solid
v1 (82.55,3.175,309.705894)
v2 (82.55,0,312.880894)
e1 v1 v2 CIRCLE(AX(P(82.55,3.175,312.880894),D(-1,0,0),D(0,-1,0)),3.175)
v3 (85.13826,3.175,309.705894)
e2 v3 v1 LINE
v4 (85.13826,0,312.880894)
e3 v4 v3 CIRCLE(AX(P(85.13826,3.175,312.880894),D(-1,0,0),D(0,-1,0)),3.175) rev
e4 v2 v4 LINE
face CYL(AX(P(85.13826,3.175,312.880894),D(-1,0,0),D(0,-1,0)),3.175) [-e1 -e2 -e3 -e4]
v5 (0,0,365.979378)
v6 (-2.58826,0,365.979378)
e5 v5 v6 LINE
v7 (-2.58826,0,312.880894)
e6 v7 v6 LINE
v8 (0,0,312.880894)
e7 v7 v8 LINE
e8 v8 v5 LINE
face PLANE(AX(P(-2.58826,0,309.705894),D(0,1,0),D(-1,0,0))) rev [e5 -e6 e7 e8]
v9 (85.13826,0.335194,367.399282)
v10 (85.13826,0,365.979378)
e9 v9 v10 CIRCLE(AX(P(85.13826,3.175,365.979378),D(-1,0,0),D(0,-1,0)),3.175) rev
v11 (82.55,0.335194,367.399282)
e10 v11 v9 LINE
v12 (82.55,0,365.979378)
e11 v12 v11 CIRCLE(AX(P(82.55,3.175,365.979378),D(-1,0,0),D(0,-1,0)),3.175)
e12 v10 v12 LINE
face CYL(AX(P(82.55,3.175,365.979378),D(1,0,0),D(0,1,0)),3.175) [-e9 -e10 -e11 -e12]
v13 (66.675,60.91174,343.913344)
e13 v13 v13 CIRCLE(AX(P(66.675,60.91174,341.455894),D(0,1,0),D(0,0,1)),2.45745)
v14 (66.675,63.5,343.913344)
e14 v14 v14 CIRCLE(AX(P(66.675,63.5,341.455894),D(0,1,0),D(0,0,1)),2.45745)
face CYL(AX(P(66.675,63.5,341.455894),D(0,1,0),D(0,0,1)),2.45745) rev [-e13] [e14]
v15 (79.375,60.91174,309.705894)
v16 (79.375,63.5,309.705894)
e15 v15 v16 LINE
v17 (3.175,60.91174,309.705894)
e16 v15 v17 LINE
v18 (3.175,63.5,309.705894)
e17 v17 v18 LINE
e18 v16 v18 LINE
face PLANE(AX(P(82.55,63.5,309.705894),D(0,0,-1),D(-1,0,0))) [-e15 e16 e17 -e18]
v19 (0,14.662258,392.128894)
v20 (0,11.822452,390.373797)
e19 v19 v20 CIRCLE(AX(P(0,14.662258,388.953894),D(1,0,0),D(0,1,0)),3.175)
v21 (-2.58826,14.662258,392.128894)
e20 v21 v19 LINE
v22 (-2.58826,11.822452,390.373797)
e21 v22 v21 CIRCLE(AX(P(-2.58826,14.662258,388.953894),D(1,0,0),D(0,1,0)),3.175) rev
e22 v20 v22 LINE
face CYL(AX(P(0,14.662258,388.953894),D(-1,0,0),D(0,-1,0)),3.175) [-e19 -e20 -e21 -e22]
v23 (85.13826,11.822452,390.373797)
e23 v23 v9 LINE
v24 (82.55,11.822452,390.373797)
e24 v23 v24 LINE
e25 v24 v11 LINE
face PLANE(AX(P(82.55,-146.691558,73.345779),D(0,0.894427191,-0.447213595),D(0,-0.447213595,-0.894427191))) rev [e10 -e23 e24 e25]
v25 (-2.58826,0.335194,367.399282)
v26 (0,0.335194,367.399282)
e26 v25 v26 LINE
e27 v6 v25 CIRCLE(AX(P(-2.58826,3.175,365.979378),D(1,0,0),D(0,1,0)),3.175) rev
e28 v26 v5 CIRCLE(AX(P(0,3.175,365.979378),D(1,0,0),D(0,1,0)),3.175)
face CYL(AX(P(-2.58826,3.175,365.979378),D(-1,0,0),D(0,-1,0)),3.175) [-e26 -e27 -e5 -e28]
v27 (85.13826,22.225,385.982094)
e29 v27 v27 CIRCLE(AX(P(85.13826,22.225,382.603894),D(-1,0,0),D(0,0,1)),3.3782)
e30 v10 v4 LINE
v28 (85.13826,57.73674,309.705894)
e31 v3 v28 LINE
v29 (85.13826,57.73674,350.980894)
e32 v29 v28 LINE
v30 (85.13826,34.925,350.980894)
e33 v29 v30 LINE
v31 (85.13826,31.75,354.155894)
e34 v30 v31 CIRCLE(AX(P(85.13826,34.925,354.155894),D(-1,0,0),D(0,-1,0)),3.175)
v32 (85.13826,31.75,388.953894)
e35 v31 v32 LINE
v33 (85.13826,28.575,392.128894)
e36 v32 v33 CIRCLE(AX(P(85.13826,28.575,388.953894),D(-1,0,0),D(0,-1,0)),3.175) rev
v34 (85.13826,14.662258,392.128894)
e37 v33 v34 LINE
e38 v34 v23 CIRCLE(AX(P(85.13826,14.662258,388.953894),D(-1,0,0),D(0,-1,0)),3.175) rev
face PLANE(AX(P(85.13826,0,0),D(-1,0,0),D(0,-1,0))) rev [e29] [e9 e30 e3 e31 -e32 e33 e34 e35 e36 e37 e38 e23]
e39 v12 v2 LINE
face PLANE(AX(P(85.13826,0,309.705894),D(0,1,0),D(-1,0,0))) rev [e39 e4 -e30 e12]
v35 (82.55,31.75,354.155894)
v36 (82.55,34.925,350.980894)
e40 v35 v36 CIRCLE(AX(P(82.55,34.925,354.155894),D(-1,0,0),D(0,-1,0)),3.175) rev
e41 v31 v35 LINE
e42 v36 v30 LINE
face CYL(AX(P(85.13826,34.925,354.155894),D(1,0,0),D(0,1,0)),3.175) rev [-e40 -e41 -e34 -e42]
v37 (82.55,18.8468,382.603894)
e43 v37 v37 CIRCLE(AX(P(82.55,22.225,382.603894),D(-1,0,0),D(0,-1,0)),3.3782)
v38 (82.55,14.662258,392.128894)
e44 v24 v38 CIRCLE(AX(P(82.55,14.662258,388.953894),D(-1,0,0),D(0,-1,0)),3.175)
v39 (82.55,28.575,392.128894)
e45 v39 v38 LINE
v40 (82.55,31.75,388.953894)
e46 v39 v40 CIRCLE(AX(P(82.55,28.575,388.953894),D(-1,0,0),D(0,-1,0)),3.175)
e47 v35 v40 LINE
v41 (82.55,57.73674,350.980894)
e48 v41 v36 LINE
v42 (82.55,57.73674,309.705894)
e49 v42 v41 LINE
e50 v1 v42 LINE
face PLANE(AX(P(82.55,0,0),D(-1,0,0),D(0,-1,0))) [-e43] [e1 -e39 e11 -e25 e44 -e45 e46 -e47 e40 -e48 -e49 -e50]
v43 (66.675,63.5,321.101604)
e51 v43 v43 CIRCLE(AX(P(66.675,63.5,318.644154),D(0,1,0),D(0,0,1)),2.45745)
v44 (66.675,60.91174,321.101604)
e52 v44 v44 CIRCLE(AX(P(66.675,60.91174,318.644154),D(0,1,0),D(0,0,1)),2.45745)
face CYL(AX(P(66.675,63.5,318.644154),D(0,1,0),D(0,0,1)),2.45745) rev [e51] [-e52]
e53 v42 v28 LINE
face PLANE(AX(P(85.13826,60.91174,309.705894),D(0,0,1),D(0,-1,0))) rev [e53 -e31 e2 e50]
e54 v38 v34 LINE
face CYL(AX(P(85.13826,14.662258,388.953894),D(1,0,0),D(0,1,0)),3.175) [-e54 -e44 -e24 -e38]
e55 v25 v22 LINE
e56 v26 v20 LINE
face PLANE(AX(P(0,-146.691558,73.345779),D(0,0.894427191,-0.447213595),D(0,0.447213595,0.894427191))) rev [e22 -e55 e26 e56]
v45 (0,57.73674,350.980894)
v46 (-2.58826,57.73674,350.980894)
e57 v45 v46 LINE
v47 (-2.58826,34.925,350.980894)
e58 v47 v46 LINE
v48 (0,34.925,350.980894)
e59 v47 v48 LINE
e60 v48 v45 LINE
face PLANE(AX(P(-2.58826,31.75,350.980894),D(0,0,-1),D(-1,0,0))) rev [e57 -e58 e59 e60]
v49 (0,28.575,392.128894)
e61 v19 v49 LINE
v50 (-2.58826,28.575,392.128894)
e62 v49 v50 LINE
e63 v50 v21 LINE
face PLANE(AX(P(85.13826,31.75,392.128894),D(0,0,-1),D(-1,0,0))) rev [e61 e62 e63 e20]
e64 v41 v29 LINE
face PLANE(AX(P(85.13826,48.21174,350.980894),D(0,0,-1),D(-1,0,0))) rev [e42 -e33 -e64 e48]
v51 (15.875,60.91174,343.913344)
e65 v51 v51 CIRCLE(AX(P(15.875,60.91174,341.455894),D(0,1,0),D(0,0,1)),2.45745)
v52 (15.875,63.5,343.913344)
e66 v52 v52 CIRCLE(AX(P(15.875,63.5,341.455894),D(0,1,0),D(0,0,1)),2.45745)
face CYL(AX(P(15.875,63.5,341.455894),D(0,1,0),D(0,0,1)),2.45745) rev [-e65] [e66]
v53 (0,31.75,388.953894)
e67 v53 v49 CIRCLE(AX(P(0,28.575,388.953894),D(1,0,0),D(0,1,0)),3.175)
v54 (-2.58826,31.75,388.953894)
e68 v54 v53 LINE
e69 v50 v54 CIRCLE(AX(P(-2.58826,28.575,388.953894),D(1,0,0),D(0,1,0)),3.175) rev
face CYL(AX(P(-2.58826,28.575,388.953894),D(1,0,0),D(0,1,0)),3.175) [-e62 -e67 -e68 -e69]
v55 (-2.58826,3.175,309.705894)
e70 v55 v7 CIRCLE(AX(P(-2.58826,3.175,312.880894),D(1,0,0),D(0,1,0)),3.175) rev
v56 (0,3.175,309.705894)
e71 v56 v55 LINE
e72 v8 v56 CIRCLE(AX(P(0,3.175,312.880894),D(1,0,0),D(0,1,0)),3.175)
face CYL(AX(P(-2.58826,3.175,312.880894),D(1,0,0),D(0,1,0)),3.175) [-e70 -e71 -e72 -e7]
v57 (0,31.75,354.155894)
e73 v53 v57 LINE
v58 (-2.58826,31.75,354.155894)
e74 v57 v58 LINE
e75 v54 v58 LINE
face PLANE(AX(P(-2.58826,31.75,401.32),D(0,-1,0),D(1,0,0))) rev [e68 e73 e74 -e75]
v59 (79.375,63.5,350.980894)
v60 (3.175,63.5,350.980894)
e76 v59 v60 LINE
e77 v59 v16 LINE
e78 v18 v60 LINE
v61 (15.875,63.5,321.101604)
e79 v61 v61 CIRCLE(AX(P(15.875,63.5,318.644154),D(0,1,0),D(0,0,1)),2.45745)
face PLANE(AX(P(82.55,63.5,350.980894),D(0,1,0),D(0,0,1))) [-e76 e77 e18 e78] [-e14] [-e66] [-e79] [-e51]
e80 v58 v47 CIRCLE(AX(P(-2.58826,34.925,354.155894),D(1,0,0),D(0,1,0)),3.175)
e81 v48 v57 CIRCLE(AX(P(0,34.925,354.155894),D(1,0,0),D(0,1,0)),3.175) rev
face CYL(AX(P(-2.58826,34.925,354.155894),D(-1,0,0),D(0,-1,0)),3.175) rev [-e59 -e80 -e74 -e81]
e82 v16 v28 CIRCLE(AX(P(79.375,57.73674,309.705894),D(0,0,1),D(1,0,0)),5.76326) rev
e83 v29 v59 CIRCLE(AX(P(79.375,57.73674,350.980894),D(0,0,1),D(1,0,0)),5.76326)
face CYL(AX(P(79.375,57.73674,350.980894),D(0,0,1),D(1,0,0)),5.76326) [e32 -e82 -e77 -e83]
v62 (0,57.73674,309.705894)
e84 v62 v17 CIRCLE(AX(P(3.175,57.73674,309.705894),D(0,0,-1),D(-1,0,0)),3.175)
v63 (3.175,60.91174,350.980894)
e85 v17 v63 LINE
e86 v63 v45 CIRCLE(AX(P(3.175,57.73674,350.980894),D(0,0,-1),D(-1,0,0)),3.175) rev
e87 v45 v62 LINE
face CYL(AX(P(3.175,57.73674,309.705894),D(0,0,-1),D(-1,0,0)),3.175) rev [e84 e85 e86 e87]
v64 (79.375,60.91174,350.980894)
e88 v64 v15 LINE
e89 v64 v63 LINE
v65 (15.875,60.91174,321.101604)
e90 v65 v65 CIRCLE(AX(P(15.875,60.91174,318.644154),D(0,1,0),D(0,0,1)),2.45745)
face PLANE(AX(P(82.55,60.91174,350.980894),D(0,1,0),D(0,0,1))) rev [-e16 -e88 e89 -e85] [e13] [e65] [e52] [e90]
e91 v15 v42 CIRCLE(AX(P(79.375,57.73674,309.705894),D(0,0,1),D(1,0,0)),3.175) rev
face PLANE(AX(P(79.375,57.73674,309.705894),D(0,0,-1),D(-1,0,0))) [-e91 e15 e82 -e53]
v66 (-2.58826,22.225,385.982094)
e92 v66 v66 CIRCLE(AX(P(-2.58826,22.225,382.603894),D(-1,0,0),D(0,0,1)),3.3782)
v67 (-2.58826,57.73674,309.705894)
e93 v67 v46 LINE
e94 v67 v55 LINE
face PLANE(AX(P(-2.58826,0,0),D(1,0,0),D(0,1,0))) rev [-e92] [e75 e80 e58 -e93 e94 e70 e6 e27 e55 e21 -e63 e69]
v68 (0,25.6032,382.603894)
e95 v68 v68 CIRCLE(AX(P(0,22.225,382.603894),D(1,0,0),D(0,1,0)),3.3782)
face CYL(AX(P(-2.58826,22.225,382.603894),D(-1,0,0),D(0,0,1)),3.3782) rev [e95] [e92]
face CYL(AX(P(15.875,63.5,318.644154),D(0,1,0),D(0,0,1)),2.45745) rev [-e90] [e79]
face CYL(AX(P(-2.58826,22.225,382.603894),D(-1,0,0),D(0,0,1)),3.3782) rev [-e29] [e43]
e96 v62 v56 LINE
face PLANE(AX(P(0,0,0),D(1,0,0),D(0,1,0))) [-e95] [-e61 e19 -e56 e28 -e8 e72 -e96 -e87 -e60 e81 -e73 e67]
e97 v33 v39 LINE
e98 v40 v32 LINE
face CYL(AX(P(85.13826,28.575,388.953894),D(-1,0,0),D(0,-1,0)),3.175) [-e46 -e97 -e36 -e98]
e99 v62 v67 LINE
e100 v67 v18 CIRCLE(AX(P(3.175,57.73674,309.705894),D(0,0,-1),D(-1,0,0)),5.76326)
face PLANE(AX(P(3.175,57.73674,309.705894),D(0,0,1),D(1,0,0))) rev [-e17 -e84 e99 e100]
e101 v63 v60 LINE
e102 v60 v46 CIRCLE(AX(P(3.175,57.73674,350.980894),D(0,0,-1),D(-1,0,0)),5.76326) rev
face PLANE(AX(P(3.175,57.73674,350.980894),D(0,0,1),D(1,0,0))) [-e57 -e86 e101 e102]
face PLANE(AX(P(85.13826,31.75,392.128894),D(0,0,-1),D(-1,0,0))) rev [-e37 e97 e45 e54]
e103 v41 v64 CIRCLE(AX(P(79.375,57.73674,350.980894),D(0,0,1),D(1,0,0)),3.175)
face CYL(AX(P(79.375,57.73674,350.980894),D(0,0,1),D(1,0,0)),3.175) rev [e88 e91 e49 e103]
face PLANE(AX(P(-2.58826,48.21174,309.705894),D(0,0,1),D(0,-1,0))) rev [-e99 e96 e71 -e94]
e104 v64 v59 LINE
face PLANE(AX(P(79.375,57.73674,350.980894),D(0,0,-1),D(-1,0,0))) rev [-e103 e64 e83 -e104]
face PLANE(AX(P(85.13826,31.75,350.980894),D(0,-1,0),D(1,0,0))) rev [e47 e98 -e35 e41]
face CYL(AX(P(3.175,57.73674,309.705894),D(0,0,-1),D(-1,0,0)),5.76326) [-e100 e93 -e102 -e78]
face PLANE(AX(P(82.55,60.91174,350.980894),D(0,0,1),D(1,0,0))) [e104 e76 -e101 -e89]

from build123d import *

# Parameters (mm, degrees)
SKETCH1_W                    = 41.275
SKETCH1_H                    = 2.58826
BASE_FLANGE1_DEPTH           = 82.55
EDGE_FLANGE1_STRIP_W         = 16.70304
EDGE_FLANGE1_STRIP_H         = 2.58826
EDGE_FLANGE1_STRIP_CUT_DEPTH = 41.275
EDGE_FLANGE1_DEPTH           = 41.275
EDGE_FLANGE1_START           = 2.58826
EDGE_FLANGE1_FLAT_DEPTH      = 2.58826
EDGE_FLANGE2_STRIP_W         = 16.70304
EDGE_FLANGE2_STRIP_H         = 2.58826
EDGE_FLANGE2_STRIP_CUT_DEPTH = 41.275
EDGE_FLANGE2_DEPTH           = 41.275
EDGE_FLANGE2_START           = 2.58826
EDGE_FLANGE2_FLAT_DEPTH      = 2.58826
F_1_4_CLEARANCE_HOLE1_D      = 6.7564
F_10_0_1935_DIAMETER_HOLE1_D = 4.9149
SKETCH19_W                   = 9.191105822
SKETCH19_H                   = 31.75
CUT_EXTRUDE1_DEPTH           = 416.675275559
FILLET2_START                = -2.58826
FILLET2_DEPTH                = 87.72652
FILLET2_2_DEPTH              = 2.58826
FILLET2_START_2              = 82.55
FILLET2_3_DEPTH              = 2.58826


with BuildPart() as part:
    # Base-Flange1: sheet metal written as solids
    # Sketch1 → Base-Flange1 (new body)
    with BuildSketch(Plane(origin=(0, 0, 0), x_dir=(0, 0, -1), z_dir=(1, 0, 0))):
        with Locations((-330.343394178, 62.20587)):
            Rectangle(SKETCH1_W, SKETCH1_H)
    extrude(amount=BASE_FLANGE1_DEPTH)

    # Edge-Flange1: sheet metal written as solids
    # Edge-Flange1 strip (on a plane across the edge) → Edge-Flange1 strip cut (cut)
    with BuildSketch(Plane(origin=(82.55, 60.91174, 309.705894178), x_dir=(-1, 0, 0), z_dir=(0, 0, 1))):
        with Locations((-5.17652, -1.29413)):
            Rectangle(EDGE_FLANGE1_STRIP_W, EDGE_FLANGE1_STRIP_H)
    extrude(amount=EDGE_FLANGE1_STRIP_CUT_DEPTH, mode=Mode.SUBTRACT)

    # Edge-Flange1 bend section (on a plane across the edge) → Edge-Flange1 (add)
    with BuildSketch(Plane(origin=(82.55, 60.91174, 309.705894178), x_dir=(-1, 0, 0), z_dir=(0, 0, 1))):
        with BuildLine():
            Line((-2.58826, 3.175), (0, 3.175))
            ThreePointArc((0, 3.175), (0.92993597, 0.92993597), (3.175, 0))
            Line((3.175, 0), (3.175, -2.58826))
            ThreePointArc((3.175, -2.58826), (-0.900240228, -0.900240228), (-2.58826, 3.175))
        make_face()
    extrude(amount=EDGE_FLANGE1_DEPTH)

    # Edge-Flange1 profile (on flange) → Edge-Flange1 flat (add)
    with BuildSketch(Plane(origin=(82.55, 60.91174, 0), x_dir=(0, 0, 1), z_dir=(1, 0, 0)).offset(EDGE_FLANGE1_START)):
        Polygon((350.980894178, 3.175), (350.980894178, 12.7), (350.980894178, 29.16174), (401.32, 29.16174), (401.32, 60.91174), (309.705894178, 60.91174), (309.705894178, 12.7), (309.705894178, 3.175), align=None)
    extrude(amount=-EDGE_FLANGE1_FLAT_DEPTH)

    # Edge-Flange2: sheet metal written as solids
    # Edge-Flange2 strip (on a plane across the edge) → Edge-Flange2 strip cut (cut)
    with BuildSketch(Plane(origin=(0, 60.91174, 350.980894178), x_dir=(1, 0, 0), z_dir=(0, 0, -1))):
        with Locations((-5.17652, -1.29413)):
            Rectangle(EDGE_FLANGE2_STRIP_W, EDGE_FLANGE2_STRIP_H)
    extrude(amount=EDGE_FLANGE2_STRIP_CUT_DEPTH, mode=Mode.SUBTRACT)

    # Edge-Flange2 bend section (on a plane across the edge) → Edge-Flange2 (add)
    with BuildSketch(Plane(origin=(0, 60.91174, 350.980894178), x_dir=(1, 0, 0), z_dir=(0, 0, -1))):
        with BuildLine():
            Line((-2.58826, 3.175), (0, 3.175))
            ThreePointArc((0, 3.175), (0.92993597, 0.92993597), (3.175, 0))
            Line((3.175, 0), (3.175, -2.58826))
            ThreePointArc((3.175, -2.58826), (-0.900240228, -0.900240228), (-2.58826, 3.175))
        make_face()
    extrude(amount=EDGE_FLANGE2_DEPTH)

    # Edge-Flange2 profile (on flange) → Edge-Flange2 flat (add)
    with BuildSketch(Plane(origin=(0, 60.91174, 0), x_dir=(0, 0, -1), z_dir=(-1, 0, 0)).offset(EDGE_FLANGE2_START)):
        Polygon((-350.980894178, 12.7), (-350.980894178, 3.175), (-309.705894178, 3.175), (-309.705894178, 12.7), (-309.705894178, 60.91174), (-401.32, 60.91174), (-401.32, 29.16174), (-350.980894178, 29.16174), align=None)
    extrude(amount=-EDGE_FLANGE2_FLAT_DEPTH)

    # 1/4 Clearance Hole1 (through all)
    with Locations(Plane.ZY.offset(2.58826)):
        with Locations((382.603894178, 22.225)):
            Hole(F_1_4_CLEARANCE_HOLE1_D / 2)

    # #10 (0.1935) Diameter Hole1 (through all)
    with Locations(Plane(origin=(0, 63.5, 0), x_dir=(1, 0, 0), z_dir=(0, 1, 0))):
        with Locations((15.875, -318.644154178), (15.875, -341.455894178), (66.675, -341.455894178), (66.675, -318.644154178)):
            Hole(F_10_0_1935_DIAMETER_HOLE1_D / 2)

    # Sketch19 → Cut-Extrude1 (cut, through all)
    with BuildSketch(Plane.ZY.offset(2.58826)):
        with Locations((396.724447089, 15.875)):
            Rectangle(SKETCH19_W, SKETCH19_H)
    extrude(amount=-CUT_EXTRUDE1_DEPTH, mode=Mode.SUBTRACT)

    # Fillet2: read off the stored shape, not the designer's step
    # Fillet2 outline → Fillet2 (cut)
    with BuildSketch(Plane.YZ.offset(FILLET2_START)):
        with BuildLine():
            ThreePointArc((0, 365.97937835), (0.084934458, 366.708843873), (0.335193669, 367.399281516))
            Line((0.335193669, 367.399281516), (11.822451583, 390.373797344))
            ThreePointArc((11.822451583, 390.373797344), (12.993061633, 391.654710495), (14.662257914, 392.128894178))
            Line((14.662257914, 392.128894178), (0, 392.128894178))
            Line((0, 392.128894178), (0, 365.97937835))
        make_face()
        with BuildLine():
            ThreePointArc((3.175, 309.705894178), (0.92993597, 310.635830148), (0, 312.880894178))
            Line((0, 312.880894178), (0, 309.705894178))
            Line((0, 309.705894178), (3.175, 309.705894178))
        make_face()
        with BuildLine():
            Line((31.75, 392.128894178), (28.575, 392.128894178))
            ThreePointArc((28.575, 392.128894178), (30.820064031, 391.198958209), (31.75, 388.953894178))
            Line((31.75, 388.953894178), (31.75, 392.128894178))
        make_face()
    extrude(amount=FILLET2_DEPTH, mode=Mode.SUBTRACT)

    # Fillet2 2 outline → Fillet2 2 (add)
    with BuildSketch(Plane.YZ.offset(FILLET2_START)):
        with BuildLine():
            ThreePointArc((34.925, 350.980894178), (32.67993597, 351.910830148), (31.75, 354.155894178))
            Line((31.75, 354.155894178), (31.75, 350.980894178))
            Line((31.75, 350.980894178), (34.925, 350.980894178))
        make_face()
    extrude(amount=FILLET2_2_DEPTH)

    # Fillet2 3 outline → Fillet2 3 (add)
    with BuildSketch(Plane.YZ.offset(FILLET2_START_2)):
        with BuildLine():
            ThreePointArc((34.925, 350.980894178), (32.67993597, 351.910830148), (31.75, 354.155894178))
            Line((31.75, 354.155894178), (31.75, 350.980894178))
            Line((31.75, 350.980894178), (34.925, 350.980894178))
        make_face()
    extrude(amount=FILLET2_3_DEPTH)


solid = part.part
